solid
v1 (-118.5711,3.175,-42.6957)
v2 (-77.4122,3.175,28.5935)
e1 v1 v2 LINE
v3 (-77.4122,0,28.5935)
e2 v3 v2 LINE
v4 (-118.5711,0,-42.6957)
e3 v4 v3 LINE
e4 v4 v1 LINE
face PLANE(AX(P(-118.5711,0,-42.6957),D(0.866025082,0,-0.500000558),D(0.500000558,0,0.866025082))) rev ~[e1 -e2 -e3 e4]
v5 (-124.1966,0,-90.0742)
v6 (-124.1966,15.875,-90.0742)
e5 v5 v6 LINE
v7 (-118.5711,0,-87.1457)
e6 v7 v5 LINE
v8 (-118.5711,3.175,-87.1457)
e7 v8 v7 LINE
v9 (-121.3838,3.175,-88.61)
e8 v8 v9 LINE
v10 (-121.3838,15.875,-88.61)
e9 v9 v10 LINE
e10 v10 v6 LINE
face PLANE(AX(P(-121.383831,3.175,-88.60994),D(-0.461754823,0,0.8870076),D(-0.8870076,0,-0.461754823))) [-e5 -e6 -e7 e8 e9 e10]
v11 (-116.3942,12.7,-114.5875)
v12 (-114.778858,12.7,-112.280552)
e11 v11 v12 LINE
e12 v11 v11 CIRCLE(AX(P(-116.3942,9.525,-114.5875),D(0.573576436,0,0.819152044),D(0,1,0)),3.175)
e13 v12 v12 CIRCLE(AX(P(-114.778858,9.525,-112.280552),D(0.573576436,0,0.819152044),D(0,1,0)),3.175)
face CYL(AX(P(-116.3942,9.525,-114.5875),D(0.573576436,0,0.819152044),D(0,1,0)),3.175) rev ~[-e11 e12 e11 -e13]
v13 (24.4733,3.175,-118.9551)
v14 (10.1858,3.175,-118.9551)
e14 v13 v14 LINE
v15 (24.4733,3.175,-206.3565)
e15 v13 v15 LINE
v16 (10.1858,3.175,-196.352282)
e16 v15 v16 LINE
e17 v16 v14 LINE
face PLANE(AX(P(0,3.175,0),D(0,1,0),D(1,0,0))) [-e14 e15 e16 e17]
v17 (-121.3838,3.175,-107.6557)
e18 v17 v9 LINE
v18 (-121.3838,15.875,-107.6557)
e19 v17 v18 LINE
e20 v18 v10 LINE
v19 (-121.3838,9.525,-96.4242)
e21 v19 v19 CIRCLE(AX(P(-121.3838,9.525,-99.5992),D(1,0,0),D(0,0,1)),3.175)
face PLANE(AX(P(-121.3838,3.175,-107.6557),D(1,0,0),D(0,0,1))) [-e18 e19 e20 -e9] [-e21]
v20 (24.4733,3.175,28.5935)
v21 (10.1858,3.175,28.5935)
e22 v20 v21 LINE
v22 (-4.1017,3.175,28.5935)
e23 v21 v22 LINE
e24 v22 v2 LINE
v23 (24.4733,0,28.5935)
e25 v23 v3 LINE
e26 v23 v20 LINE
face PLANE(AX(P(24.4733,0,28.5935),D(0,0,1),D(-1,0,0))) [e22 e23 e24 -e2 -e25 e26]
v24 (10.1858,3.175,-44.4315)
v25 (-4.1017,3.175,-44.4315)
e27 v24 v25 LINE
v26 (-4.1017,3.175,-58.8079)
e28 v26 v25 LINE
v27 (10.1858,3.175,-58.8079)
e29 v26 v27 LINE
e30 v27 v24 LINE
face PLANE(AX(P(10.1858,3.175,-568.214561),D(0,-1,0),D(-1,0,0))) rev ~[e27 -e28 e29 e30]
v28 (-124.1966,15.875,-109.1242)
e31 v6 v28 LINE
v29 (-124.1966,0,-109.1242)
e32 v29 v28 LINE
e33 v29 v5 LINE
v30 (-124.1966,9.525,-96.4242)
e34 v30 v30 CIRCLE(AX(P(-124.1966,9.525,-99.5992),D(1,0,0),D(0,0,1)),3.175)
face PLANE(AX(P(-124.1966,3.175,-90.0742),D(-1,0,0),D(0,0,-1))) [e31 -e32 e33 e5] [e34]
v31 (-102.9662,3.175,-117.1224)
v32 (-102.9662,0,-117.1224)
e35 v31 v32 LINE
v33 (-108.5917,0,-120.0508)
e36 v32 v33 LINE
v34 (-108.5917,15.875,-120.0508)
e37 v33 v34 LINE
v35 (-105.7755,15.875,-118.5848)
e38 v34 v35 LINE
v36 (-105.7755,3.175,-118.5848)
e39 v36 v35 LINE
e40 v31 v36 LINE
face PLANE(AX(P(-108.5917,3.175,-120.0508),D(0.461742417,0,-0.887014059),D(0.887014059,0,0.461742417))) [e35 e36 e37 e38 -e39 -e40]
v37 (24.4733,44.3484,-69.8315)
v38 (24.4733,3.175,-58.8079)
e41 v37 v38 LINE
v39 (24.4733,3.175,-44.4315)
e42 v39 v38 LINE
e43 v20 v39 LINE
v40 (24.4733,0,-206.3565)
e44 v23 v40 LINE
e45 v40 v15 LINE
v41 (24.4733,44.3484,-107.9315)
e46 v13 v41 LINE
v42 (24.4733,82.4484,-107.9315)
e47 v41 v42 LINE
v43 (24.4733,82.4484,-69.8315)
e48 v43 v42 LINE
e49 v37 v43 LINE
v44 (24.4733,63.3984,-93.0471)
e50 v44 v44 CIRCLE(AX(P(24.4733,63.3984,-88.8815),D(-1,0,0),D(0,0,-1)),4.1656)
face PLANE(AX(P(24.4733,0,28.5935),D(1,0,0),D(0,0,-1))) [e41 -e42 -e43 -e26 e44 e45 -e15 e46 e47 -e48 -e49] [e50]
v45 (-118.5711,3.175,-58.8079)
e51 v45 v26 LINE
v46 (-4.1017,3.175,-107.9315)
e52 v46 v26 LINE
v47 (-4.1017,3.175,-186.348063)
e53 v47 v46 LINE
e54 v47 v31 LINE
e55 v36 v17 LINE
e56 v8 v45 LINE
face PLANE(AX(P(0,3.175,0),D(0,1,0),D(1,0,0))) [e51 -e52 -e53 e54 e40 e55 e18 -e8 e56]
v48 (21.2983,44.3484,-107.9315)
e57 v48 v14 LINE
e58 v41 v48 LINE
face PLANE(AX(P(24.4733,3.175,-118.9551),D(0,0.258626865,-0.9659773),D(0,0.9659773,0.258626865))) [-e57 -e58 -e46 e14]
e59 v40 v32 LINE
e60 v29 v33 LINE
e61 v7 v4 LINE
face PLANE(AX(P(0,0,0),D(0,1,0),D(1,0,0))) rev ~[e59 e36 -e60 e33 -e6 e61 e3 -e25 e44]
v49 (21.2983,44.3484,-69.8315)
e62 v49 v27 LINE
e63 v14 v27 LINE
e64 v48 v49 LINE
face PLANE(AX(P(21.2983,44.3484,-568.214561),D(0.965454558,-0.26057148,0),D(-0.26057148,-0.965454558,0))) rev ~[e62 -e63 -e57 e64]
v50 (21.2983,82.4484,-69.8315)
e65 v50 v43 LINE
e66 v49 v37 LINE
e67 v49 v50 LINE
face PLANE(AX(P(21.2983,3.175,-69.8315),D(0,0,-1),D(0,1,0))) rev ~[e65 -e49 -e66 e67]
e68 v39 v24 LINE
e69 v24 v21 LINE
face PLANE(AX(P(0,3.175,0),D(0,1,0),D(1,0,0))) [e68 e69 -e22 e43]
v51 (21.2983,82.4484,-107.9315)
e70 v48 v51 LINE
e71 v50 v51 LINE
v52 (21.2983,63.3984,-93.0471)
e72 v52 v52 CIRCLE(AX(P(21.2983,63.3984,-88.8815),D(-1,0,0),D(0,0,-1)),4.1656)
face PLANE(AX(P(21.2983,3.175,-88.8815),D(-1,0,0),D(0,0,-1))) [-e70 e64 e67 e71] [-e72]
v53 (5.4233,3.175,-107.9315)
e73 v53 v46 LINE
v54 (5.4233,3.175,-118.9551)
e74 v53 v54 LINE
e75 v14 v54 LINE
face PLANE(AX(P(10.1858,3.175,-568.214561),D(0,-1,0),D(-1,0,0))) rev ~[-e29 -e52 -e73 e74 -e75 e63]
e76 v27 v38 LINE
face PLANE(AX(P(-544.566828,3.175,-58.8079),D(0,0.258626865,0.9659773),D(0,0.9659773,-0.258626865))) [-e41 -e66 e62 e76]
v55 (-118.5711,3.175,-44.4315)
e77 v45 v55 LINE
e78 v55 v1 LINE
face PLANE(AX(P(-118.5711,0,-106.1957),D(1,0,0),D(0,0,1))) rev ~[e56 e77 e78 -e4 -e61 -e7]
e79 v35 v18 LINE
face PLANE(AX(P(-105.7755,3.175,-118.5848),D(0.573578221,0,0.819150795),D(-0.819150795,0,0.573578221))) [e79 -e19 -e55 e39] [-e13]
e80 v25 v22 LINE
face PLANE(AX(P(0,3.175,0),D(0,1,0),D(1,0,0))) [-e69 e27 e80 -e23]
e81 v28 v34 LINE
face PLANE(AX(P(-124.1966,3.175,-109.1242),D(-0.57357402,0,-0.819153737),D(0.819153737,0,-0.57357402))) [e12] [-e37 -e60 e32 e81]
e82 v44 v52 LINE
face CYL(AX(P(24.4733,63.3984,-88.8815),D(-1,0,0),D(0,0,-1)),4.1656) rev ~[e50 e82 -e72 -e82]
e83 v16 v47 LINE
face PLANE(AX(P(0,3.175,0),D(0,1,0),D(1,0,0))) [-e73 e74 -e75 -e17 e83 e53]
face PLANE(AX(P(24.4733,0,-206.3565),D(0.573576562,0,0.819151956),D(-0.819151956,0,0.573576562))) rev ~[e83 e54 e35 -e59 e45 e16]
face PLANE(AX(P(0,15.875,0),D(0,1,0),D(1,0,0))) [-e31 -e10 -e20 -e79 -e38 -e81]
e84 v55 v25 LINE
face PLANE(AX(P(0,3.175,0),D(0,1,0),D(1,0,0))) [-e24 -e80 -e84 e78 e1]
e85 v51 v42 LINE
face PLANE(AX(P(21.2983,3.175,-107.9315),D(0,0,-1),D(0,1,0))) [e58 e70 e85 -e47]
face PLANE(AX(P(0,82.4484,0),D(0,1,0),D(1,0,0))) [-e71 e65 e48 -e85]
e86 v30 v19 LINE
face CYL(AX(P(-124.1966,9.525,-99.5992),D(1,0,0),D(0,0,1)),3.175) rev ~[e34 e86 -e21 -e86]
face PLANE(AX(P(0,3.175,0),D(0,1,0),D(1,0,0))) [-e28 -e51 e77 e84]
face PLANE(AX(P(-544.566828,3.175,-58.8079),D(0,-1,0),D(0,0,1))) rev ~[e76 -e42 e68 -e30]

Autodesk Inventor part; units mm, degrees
ref_plane "YZ Plane" through (0, 0, 0) normal (1, 0, 0) x (0, 1, 0)
ref_plane "XZ Plane" through (0, 0, 0) normal (0, 1, 0) x (-1, 0, 0)
ref_plane "XY Plane" through (0, 0, 0) normal (0, 0, 1) x (1, 0, 0)
sketch "Sketch1" plane through (0, 0, 0) normal (0, 1, 0) x (-1, 0, 0)
  line L0 (-24.4733, 28.5935) -> (-24.4733, -206.3565)
  line L1 (-24.4733, -206.3565) -> (118.5711, -106.1957)
  line L2 (-24.4733, -206.3565) -> (150.1517, -206.3565) construction
  line L3 (118.5711, -106.1957) -> (118.5711, -42.6957)
  line L4 (118.5711, -42.6957) -> (77.4122, 28.5935)
  line L5 (-24.4733, 28.5935) -> (77.4122, 28.5935)
  point P0 (0, 0)
  dimension "d0" = 234.95
  dimension "d1" = 174.625
  dimension "d2" = 35
  dimension "d3" = 63.5
  dimension "d4" = 150
extrude "Extrusion1" add sketch "Sketch1" along normal blind 3.175
sketch "Sketch2" plane through (0, 3.175, 0) normal (0, 1, 0) x (1, 0, 0)
  line L0 (-77.4122, -28.5935) -> (24.4733, -28.5935) projected
  line L1 (24.4733, -28.5935) -> (24.4733, 206.3565)
  line L2 (21.2983, 88.8815) -> (21.2983, 107.9315)
  line L3 (21.2983, 107.9315) -> (24.4733, 107.9315)
  line L4 (21.2983, 88.8815) -> (21.2983, 69.8315)
  line L5 (21.2983, 69.8315) -> (24.4733, 69.8315)
  point P0 (0, 0)
  dimension "d8" = 19.05
  dimension "d9" = 19.05
extrude "Extrusion2" add sketch "Sketch2" along normal blind 79.2734
sketch "Sketch3" plane through (24.4733, 0, 28.5935) normal (1, 0, 0) x (0, 0, -1)
  line L0 (136.525, 82.4484) -> (117.475, 82.4484)
  line L1 (117.475, 82.4484) -> (117.475, 63.3984)
  line L2 (117.475, 63.3984) -> (136.525, 63.3984)
  line L3 (136.525, 63.3984) -> (136.525, 82.4484)
  point P0 (28.5935, 0)
  dimension "d12" = 19.05
  dimension "d13" = 19.05
hole "Hole1" at (24.4733, 63.3984, -88.8815) direction (-1, 0, 0) diameter 8.3312 end through all
sketch "Sketch4" plane through (0, 3.175, 0) normal (0, 1, 0) x (1, 0, 0)
  line L0 (-102.9662, 117.1224) -> (-118.5711, 106.1957)
  line L1 (-118.5711, 87.1457) -> (-118.5711, 106.1957)
  line L2 (-124.1966, 109.1242) -> (-108.5917, 120.0508)
  line L3 (-124.1966, 109.1242) -> (-124.1966, 90.0742)
  line L4 (-102.9662, 117.1224) -> (-108.5917, 120.0508)
  line L5 (-118.5711, 87.1457) -> (-124.1966, 90.0742)
  point P0 (0, 0)
  dimension "d21" = 19.05
  dimension "d23" = 19.05
extrude "Extrusion3" add sketch "Sketch4" against normal blind 3.175
sketch "Sketch5" plane through (0, 3.175, 0) normal (0, 1, 0) x (1, 0, 0)
  line L0 (-108.5917, 120.0508) -> (-102.9662, 117.1224) projected
  line L1 (-124.1966, 109.1242) -> (-108.5917, 120.0508) projected
  line L2 (-124.1966, 90.0742) -> (-124.1966, 109.1242) projected
  line L3 (-118.5711, 87.1457) -> (-124.1966, 90.0742) projected
  line L4 (-124.1966, 90.0742) -> (-124.1966, 109.1242)
  line L5 (-124.1966, 109.1242) -> (-108.5917, 120.0508)
  line L6 (-108.5917, 120.0508) -> (-105.7755, 118.5848)
  line L7 (-105.7755, 118.5848) -> (-121.3838, 107.6557)
  line L8 (-121.3838, 107.6557) -> (-121.3838, 88.61)
  line L9 (-121.3838, 88.61) -> (-124.1966, 90.0742)
  point P0 (0, 0)
  dimension "d28" = 3.175
extrude "Extrusion4" add sketch "Sketch5" along normal blind 12.7
sketch "Sketch6" plane through (-108.5917, 0, -120.0508) normal (-0.5735764, 0, -0.819152) x (-0.819152, 0, 0.5735764)
  line L0 (19.05, 15.875) -> (19.05, 0) projected
  line L1 (0, 15.875) -> (19.05, 15.875)
  line L2 (9.525, 15.875) -> (9.525, 9.525)
  point P0 (-20.0948, 0)
  dimension "d31" = 6.35
hole "Hole2" at (-116.3942, 9.525, -114.5875) direction (0.5735764, 0, 0.819152) diameter 6.35 end through all
sketch "Sketch7" plane through (-124.1966, 0, -109.1242) normal (-1, 0, 0) x (0, 0, 1)
  line L0 (0, 15.875) -> (19.05, 15.875) projected
  line L1 (9.525, 15.875) -> (9.525, 9.525)
  point P0 (109.1242, 0)
  dimension "d39" = 6.35
hole "Hole3" at (-124.1966, 9.525, -99.5992) direction (1, 0, 0) diameter 6.35 depth 25.4 tip angle 118
sketch "Sketch8" plane through (21.2983, 3.175, -107.9315) normal (-1, 0, 0) x (0, 0, 1)
  line L0 (38.1, 0) -> (0, 0) projected
  line L1 (38.1, 0) -> (38.1, 79.2734) projected
  line L2 (0, 0) -> (0, 79.2734) projected
  line L3 (0, 41.1734) -> (38.1, 41.1734)
  line L4 (38.1, 41.1734) -> (38.1, 0)
  line L5 (38.1, 0) -> (0, 0)
  line L6 (0, 0) -> (0, 41.1734)
  point P0 (107.9315, -3.175)
  dimension "d47" = 38.1
extrude "Extrusion5" add sketch "Sketch8" along normal blind 25.4
sketch "Sketch9" plane through (21.2983, 82.4484, -69.8315) normal (0, 0, 1) x (1, 0, 0)
  line L0 (-25.4, -38.1) -> (3.175, -38.1)
  line L1 (3.175, -38.1) -> (3.175, -79.2734)
  line L2 (3.175, -79.2734) -> (-25.4, -79.2734)
  line L3 (-25.4, -79.2734) -> (-25.4, -38.1)
  point P0 (-21.2983, -82.4484)
extrude "Extrusion6" add sketch "Sketch9" along normal blind 25.4
sketch "Sketch13" plane through (24.4733, 0, 28.5935) normal (1, 0, 0) x (0, 0, -1)
  line L0 (98.425, 44.3484) -> (98.425, 82.4484) projected
  line L1 (147.5486, 3.175) -> (136.525, 44.3484)
  line L2 (147.5486, 3.175) -> (161.925, 3.175)
  line L3 (136.525, 44.3484) -> (161.925, 44.3484)
  line L4 (161.925, 44.3484) -> (161.925, 3.175)
  point P0 (28.5935, 0)
split_face "Split3"
sketch "Sketch14" plane through (24.4733, 0, 28.5935) normal (1, 0, 0) x (0, 0, -1)
  line L0 (161.925, 3.175) -> (234.95, 3.175) projected
  line L1 (136.525, 3.175) -> (147.5486, 3.175) projected
  line L2 (136.525, 44.3484) -> (136.525, 3.175)
  line L3 (136.525, 3.175) -> (147.5486, 3.175)
  line L4 (147.5486, 3.175) -> (136.525, 44.3484)
  point P0 (28.5935, 0)
  dimension "d73" = 11.0236
extrude "Extrusion8" add sketch "Sketch14" against normal blind 19.05
sketch "Sketch15" plane through (21.2983, 82.4484, -44.4315) normal (0, 0, 1) x (1, 0, 0)
  line L0 (0, -38.1) -> (-11.1125, -79.2734)
  line L1 (-11.1125, -79.2734) -> (-25.4, -79.2734)
  line L2 (-25.4, -79.2734) -> (-25.4, -38.1)
  line L3 (-25.4, -38.1) -> (0, -38.1)
  point P0 (-21.2983, -82.4484)
split body "Split4" sketch "Sketch15" result one side removed curves L0 L1 L2 L3 removed pieces at (13.4073, 17.0298, -77.7394)
sketch "Sketch16" plane through (24.4733, 0, 28.5935) normal (1, 0, 0) x (0, 0, -1)
  line L0 (87.4014, 3.175) -> (98.425, 44.3484)
  line L1 (87.4014, 3.175) -> (73.025, 3.175)
  line L2 (73.025, 3.175) -> (73.025, 44.3484)
  line L3 (73.025, 44.3484) -> (98.425, 44.3484)
  point P0 (28.5935, 0)
split body "Split5" sketch "Sketch16" result one side removed curves L3 L0 L1 L2 removed pieces at (18.0769, 30.4936, -57.6903)
properties part number "Right Chest"
